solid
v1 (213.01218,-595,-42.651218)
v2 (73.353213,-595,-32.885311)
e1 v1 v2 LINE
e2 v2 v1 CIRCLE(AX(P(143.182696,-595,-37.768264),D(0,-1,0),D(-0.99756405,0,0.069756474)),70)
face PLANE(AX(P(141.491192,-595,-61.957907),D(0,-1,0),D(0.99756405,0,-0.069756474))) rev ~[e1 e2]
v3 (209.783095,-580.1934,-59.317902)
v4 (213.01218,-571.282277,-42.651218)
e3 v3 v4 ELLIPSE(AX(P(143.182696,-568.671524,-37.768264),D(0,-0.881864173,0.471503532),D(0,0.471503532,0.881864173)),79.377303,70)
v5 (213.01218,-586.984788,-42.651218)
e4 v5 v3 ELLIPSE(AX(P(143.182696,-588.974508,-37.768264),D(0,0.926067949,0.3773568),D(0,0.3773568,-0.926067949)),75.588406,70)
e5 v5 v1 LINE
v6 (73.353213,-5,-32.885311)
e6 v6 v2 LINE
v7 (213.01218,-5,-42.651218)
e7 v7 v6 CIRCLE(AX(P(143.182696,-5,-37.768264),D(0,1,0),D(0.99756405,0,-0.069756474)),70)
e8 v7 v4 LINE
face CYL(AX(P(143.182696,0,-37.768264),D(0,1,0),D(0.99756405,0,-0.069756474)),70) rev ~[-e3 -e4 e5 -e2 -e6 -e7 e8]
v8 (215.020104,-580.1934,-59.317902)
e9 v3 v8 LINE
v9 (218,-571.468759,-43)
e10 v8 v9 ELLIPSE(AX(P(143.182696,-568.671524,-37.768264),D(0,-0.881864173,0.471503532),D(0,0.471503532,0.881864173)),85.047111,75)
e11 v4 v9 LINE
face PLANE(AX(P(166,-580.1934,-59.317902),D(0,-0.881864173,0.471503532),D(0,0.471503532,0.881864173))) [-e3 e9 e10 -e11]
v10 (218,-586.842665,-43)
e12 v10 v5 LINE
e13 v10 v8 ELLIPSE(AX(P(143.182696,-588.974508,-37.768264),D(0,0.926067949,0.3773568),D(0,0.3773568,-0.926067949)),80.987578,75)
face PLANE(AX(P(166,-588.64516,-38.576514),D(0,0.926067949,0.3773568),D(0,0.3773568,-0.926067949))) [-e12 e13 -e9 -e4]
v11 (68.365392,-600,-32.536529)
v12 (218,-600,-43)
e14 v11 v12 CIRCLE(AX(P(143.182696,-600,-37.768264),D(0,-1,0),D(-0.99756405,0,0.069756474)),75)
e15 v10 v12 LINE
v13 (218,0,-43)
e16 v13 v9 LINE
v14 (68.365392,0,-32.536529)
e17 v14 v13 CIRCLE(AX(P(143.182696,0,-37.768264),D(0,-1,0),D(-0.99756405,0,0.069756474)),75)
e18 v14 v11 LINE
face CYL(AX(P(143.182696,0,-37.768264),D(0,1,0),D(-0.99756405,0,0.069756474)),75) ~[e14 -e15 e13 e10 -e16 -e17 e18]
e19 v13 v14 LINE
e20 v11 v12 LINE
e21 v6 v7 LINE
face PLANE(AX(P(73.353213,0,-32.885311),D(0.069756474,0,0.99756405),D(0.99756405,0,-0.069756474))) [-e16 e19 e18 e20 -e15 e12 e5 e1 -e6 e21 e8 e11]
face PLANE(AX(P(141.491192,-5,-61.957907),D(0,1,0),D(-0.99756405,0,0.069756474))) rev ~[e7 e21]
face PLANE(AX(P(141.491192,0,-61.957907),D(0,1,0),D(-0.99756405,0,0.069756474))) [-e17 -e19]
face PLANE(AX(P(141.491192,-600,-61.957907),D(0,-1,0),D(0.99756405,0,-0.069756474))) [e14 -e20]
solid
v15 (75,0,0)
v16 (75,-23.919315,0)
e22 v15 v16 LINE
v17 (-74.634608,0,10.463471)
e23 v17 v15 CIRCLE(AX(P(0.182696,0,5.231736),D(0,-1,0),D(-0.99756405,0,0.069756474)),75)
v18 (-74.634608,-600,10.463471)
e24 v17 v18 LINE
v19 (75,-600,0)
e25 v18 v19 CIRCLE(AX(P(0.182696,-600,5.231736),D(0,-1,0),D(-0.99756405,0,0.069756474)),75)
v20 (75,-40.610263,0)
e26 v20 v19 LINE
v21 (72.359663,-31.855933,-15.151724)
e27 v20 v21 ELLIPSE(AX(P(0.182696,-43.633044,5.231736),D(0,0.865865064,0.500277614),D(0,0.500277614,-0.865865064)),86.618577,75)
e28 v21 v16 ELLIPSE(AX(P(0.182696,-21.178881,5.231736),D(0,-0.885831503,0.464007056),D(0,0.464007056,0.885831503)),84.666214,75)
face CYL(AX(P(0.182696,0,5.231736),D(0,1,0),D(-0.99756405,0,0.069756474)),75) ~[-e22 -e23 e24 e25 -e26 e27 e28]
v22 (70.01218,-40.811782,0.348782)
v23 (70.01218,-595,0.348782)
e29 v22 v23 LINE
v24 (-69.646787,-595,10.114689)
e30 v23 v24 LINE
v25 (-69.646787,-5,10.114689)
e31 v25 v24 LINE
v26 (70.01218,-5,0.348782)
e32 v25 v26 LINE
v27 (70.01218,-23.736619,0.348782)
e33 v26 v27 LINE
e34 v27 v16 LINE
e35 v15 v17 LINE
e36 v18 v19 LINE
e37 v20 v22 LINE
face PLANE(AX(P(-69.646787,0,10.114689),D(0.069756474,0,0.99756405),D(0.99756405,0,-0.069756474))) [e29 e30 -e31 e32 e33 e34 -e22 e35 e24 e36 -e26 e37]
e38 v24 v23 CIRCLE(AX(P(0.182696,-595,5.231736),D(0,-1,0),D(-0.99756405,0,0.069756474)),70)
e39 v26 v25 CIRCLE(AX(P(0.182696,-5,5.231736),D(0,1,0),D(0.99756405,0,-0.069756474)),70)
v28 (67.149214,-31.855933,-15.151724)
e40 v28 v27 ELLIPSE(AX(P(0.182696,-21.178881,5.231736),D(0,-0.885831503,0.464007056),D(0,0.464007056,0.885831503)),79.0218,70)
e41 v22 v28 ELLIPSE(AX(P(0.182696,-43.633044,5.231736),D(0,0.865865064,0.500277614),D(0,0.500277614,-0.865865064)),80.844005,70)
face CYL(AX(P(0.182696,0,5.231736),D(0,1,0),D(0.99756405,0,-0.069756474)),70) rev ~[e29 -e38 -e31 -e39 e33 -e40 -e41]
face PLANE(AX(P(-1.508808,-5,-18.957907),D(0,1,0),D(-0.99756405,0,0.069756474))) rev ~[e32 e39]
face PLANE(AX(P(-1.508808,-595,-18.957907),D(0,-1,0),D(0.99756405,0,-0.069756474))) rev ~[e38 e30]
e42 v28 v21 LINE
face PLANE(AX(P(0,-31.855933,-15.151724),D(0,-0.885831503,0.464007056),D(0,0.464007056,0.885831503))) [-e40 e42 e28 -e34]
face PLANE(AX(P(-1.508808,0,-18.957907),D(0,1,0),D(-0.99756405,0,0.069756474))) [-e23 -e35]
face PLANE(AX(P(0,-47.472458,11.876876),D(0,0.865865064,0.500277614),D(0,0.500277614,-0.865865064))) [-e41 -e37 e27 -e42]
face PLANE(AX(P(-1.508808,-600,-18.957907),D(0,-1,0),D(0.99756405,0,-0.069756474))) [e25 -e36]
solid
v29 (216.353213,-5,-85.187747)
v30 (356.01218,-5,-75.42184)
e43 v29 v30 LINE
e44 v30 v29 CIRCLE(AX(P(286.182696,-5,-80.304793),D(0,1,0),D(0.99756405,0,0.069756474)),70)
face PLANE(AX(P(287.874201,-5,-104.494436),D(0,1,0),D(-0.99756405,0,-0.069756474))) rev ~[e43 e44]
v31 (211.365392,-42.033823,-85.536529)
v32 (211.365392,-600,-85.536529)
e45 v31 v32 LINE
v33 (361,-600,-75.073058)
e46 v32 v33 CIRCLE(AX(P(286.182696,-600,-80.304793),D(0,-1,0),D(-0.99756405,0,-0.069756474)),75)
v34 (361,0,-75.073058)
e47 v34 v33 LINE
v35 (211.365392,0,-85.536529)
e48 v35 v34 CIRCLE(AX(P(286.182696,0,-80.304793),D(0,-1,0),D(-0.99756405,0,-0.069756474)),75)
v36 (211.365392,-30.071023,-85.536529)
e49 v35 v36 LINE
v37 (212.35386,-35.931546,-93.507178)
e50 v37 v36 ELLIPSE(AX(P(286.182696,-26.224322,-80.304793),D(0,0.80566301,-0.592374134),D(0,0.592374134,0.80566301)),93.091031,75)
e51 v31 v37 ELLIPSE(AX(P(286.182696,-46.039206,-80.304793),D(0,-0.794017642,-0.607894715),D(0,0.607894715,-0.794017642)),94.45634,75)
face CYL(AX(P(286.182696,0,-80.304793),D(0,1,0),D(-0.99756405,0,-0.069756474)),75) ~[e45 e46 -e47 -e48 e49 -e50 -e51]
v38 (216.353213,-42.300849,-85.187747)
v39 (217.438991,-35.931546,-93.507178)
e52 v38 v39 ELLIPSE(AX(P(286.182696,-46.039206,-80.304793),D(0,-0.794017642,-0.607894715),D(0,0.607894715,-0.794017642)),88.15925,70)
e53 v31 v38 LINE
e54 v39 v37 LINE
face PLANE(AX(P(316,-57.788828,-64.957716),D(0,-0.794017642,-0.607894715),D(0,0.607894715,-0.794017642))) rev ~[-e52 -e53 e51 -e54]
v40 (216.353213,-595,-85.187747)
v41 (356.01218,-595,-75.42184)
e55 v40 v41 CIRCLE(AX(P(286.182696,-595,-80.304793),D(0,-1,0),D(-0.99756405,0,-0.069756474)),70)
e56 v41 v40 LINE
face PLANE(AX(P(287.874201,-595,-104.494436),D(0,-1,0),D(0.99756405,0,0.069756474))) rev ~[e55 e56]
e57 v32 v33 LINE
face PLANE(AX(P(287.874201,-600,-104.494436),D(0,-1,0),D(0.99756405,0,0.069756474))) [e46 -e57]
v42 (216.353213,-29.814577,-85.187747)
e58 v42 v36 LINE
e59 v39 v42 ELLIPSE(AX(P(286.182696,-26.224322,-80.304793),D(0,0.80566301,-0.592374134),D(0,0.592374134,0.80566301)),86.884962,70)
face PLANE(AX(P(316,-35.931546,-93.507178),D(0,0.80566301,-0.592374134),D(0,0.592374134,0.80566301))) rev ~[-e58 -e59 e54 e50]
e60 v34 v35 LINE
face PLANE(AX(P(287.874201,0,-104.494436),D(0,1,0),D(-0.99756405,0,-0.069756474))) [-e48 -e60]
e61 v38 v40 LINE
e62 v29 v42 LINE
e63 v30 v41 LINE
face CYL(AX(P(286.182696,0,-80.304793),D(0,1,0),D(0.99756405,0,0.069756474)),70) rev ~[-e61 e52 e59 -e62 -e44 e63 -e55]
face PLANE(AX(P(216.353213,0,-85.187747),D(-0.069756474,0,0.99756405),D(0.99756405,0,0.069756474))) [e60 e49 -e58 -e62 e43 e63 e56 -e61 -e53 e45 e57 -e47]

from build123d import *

# Parameters (mm, degrees)
F1_DEPTH  = 600
F3_DEPTH  = 5
F5_DEPTH  = 5
F6_ANGLE  = 4
F10_DEPTH = 178
F13_DEPTH = 121
F16_ANGLE = -8
F17_DEPTH = 105


with BuildPart() as f1:
    # F0 (on Front) → F1 (new body)
    with BuildSketch(Plane.XZ):
        with BuildLine():
            ThreePointArc((-75, 0), (0, -75), (75, 0))
            Line((75, 0), (70, 0))
            ThreePointArc((70, 0), (0, -70), (-70, 0))
            Line((-70, 0), (-75, 0))
        make_face()
    extrude(amount=F1_DEPTH)

    # F2 (on face) → F3 (join)
    with BuildSketch(Plane.XZ.offset(600)):
        with BuildLine():
            Line((70, 0), (-70, 0))
            ThreePointArc((-70, 0), (0, -70), (70, 0))
        make_face()
    extrude(amount=-F3_DEPTH)

    # F4 (on face) → F5 (join)
    with BuildSketch(Plane(origin=(0, 0, 0), x_dir=(-1, 0, 0), z_dir=(0, 1, 0))):
        with BuildLine():
            Line((70, 0), (-70, 0))
            ThreePointArc((-70, 0), (0, -70), (70, 0))
        make_face()
    extrude(amount=-F5_DEPTH)


with BuildPart() as f1_1:
    # F6: moved
    add(f1.part.rotate(Axis((75, -300, 0), (0, 1, 0)), F6_ANGLE))


with BuildPart() as f7_1:
    # F7: copy of F1
    add(f1_1.part.moved(Location((143, 0, -43))))


with BuildPart() as f8_1:
    # F8: copy of F7_1
    add(f7_1.part.moved(Location((143, 0, -53))))


with BuildPart() as f1_2:
    add(f1_1.part)

    # F9 (on Right) → F10 (cut)
    with BuildSketch(Plane.YZ):
        Polygon((-31.8559333682, -15.1517242193), (-18.6419468373, 10.0749731064), (-47.4724583328, 11.8768755347), align=None)
    extrude(amount=F10_DEPTH, mode=Mode.SUBTRACT)


with BuildPart() as f7_1_1:
    add(f7_1.part)

    # F12 (on offset) → F13 (cut)
    with BuildSketch(Plane.YZ.offset(166)):
        Polygon((-569.4248080254, -39.1771495342), (-588.6451601982, -38.5765135288), (-580.193400383, -59.3179017305), align=None)
    extrude(amount=F13_DEPTH, mode=Mode.SUBTRACT)


with BuildPart() as f8_1_1:
    # F16: moved
    add(f8_1.part.rotate(Axis((211.365392461, -300, -85.5365289384), (0, 1, 0)), F16_ANGLE))

    # F15 (on offset) → F17 (cut)
    with BuildSketch(Plane.YZ.offset(316)):
        Polygon((-35.931546241, -93.5071781278), (-15.5054412415, -65.7264964947), (-57.7888276324, -64.9577161884), align=None)
    extrude(amount=-F17_DEPTH, mode=Mode.SUBTRACT)


solid = Compound([f1_2.part, f7_1_1.part, f8_1_1.part])
